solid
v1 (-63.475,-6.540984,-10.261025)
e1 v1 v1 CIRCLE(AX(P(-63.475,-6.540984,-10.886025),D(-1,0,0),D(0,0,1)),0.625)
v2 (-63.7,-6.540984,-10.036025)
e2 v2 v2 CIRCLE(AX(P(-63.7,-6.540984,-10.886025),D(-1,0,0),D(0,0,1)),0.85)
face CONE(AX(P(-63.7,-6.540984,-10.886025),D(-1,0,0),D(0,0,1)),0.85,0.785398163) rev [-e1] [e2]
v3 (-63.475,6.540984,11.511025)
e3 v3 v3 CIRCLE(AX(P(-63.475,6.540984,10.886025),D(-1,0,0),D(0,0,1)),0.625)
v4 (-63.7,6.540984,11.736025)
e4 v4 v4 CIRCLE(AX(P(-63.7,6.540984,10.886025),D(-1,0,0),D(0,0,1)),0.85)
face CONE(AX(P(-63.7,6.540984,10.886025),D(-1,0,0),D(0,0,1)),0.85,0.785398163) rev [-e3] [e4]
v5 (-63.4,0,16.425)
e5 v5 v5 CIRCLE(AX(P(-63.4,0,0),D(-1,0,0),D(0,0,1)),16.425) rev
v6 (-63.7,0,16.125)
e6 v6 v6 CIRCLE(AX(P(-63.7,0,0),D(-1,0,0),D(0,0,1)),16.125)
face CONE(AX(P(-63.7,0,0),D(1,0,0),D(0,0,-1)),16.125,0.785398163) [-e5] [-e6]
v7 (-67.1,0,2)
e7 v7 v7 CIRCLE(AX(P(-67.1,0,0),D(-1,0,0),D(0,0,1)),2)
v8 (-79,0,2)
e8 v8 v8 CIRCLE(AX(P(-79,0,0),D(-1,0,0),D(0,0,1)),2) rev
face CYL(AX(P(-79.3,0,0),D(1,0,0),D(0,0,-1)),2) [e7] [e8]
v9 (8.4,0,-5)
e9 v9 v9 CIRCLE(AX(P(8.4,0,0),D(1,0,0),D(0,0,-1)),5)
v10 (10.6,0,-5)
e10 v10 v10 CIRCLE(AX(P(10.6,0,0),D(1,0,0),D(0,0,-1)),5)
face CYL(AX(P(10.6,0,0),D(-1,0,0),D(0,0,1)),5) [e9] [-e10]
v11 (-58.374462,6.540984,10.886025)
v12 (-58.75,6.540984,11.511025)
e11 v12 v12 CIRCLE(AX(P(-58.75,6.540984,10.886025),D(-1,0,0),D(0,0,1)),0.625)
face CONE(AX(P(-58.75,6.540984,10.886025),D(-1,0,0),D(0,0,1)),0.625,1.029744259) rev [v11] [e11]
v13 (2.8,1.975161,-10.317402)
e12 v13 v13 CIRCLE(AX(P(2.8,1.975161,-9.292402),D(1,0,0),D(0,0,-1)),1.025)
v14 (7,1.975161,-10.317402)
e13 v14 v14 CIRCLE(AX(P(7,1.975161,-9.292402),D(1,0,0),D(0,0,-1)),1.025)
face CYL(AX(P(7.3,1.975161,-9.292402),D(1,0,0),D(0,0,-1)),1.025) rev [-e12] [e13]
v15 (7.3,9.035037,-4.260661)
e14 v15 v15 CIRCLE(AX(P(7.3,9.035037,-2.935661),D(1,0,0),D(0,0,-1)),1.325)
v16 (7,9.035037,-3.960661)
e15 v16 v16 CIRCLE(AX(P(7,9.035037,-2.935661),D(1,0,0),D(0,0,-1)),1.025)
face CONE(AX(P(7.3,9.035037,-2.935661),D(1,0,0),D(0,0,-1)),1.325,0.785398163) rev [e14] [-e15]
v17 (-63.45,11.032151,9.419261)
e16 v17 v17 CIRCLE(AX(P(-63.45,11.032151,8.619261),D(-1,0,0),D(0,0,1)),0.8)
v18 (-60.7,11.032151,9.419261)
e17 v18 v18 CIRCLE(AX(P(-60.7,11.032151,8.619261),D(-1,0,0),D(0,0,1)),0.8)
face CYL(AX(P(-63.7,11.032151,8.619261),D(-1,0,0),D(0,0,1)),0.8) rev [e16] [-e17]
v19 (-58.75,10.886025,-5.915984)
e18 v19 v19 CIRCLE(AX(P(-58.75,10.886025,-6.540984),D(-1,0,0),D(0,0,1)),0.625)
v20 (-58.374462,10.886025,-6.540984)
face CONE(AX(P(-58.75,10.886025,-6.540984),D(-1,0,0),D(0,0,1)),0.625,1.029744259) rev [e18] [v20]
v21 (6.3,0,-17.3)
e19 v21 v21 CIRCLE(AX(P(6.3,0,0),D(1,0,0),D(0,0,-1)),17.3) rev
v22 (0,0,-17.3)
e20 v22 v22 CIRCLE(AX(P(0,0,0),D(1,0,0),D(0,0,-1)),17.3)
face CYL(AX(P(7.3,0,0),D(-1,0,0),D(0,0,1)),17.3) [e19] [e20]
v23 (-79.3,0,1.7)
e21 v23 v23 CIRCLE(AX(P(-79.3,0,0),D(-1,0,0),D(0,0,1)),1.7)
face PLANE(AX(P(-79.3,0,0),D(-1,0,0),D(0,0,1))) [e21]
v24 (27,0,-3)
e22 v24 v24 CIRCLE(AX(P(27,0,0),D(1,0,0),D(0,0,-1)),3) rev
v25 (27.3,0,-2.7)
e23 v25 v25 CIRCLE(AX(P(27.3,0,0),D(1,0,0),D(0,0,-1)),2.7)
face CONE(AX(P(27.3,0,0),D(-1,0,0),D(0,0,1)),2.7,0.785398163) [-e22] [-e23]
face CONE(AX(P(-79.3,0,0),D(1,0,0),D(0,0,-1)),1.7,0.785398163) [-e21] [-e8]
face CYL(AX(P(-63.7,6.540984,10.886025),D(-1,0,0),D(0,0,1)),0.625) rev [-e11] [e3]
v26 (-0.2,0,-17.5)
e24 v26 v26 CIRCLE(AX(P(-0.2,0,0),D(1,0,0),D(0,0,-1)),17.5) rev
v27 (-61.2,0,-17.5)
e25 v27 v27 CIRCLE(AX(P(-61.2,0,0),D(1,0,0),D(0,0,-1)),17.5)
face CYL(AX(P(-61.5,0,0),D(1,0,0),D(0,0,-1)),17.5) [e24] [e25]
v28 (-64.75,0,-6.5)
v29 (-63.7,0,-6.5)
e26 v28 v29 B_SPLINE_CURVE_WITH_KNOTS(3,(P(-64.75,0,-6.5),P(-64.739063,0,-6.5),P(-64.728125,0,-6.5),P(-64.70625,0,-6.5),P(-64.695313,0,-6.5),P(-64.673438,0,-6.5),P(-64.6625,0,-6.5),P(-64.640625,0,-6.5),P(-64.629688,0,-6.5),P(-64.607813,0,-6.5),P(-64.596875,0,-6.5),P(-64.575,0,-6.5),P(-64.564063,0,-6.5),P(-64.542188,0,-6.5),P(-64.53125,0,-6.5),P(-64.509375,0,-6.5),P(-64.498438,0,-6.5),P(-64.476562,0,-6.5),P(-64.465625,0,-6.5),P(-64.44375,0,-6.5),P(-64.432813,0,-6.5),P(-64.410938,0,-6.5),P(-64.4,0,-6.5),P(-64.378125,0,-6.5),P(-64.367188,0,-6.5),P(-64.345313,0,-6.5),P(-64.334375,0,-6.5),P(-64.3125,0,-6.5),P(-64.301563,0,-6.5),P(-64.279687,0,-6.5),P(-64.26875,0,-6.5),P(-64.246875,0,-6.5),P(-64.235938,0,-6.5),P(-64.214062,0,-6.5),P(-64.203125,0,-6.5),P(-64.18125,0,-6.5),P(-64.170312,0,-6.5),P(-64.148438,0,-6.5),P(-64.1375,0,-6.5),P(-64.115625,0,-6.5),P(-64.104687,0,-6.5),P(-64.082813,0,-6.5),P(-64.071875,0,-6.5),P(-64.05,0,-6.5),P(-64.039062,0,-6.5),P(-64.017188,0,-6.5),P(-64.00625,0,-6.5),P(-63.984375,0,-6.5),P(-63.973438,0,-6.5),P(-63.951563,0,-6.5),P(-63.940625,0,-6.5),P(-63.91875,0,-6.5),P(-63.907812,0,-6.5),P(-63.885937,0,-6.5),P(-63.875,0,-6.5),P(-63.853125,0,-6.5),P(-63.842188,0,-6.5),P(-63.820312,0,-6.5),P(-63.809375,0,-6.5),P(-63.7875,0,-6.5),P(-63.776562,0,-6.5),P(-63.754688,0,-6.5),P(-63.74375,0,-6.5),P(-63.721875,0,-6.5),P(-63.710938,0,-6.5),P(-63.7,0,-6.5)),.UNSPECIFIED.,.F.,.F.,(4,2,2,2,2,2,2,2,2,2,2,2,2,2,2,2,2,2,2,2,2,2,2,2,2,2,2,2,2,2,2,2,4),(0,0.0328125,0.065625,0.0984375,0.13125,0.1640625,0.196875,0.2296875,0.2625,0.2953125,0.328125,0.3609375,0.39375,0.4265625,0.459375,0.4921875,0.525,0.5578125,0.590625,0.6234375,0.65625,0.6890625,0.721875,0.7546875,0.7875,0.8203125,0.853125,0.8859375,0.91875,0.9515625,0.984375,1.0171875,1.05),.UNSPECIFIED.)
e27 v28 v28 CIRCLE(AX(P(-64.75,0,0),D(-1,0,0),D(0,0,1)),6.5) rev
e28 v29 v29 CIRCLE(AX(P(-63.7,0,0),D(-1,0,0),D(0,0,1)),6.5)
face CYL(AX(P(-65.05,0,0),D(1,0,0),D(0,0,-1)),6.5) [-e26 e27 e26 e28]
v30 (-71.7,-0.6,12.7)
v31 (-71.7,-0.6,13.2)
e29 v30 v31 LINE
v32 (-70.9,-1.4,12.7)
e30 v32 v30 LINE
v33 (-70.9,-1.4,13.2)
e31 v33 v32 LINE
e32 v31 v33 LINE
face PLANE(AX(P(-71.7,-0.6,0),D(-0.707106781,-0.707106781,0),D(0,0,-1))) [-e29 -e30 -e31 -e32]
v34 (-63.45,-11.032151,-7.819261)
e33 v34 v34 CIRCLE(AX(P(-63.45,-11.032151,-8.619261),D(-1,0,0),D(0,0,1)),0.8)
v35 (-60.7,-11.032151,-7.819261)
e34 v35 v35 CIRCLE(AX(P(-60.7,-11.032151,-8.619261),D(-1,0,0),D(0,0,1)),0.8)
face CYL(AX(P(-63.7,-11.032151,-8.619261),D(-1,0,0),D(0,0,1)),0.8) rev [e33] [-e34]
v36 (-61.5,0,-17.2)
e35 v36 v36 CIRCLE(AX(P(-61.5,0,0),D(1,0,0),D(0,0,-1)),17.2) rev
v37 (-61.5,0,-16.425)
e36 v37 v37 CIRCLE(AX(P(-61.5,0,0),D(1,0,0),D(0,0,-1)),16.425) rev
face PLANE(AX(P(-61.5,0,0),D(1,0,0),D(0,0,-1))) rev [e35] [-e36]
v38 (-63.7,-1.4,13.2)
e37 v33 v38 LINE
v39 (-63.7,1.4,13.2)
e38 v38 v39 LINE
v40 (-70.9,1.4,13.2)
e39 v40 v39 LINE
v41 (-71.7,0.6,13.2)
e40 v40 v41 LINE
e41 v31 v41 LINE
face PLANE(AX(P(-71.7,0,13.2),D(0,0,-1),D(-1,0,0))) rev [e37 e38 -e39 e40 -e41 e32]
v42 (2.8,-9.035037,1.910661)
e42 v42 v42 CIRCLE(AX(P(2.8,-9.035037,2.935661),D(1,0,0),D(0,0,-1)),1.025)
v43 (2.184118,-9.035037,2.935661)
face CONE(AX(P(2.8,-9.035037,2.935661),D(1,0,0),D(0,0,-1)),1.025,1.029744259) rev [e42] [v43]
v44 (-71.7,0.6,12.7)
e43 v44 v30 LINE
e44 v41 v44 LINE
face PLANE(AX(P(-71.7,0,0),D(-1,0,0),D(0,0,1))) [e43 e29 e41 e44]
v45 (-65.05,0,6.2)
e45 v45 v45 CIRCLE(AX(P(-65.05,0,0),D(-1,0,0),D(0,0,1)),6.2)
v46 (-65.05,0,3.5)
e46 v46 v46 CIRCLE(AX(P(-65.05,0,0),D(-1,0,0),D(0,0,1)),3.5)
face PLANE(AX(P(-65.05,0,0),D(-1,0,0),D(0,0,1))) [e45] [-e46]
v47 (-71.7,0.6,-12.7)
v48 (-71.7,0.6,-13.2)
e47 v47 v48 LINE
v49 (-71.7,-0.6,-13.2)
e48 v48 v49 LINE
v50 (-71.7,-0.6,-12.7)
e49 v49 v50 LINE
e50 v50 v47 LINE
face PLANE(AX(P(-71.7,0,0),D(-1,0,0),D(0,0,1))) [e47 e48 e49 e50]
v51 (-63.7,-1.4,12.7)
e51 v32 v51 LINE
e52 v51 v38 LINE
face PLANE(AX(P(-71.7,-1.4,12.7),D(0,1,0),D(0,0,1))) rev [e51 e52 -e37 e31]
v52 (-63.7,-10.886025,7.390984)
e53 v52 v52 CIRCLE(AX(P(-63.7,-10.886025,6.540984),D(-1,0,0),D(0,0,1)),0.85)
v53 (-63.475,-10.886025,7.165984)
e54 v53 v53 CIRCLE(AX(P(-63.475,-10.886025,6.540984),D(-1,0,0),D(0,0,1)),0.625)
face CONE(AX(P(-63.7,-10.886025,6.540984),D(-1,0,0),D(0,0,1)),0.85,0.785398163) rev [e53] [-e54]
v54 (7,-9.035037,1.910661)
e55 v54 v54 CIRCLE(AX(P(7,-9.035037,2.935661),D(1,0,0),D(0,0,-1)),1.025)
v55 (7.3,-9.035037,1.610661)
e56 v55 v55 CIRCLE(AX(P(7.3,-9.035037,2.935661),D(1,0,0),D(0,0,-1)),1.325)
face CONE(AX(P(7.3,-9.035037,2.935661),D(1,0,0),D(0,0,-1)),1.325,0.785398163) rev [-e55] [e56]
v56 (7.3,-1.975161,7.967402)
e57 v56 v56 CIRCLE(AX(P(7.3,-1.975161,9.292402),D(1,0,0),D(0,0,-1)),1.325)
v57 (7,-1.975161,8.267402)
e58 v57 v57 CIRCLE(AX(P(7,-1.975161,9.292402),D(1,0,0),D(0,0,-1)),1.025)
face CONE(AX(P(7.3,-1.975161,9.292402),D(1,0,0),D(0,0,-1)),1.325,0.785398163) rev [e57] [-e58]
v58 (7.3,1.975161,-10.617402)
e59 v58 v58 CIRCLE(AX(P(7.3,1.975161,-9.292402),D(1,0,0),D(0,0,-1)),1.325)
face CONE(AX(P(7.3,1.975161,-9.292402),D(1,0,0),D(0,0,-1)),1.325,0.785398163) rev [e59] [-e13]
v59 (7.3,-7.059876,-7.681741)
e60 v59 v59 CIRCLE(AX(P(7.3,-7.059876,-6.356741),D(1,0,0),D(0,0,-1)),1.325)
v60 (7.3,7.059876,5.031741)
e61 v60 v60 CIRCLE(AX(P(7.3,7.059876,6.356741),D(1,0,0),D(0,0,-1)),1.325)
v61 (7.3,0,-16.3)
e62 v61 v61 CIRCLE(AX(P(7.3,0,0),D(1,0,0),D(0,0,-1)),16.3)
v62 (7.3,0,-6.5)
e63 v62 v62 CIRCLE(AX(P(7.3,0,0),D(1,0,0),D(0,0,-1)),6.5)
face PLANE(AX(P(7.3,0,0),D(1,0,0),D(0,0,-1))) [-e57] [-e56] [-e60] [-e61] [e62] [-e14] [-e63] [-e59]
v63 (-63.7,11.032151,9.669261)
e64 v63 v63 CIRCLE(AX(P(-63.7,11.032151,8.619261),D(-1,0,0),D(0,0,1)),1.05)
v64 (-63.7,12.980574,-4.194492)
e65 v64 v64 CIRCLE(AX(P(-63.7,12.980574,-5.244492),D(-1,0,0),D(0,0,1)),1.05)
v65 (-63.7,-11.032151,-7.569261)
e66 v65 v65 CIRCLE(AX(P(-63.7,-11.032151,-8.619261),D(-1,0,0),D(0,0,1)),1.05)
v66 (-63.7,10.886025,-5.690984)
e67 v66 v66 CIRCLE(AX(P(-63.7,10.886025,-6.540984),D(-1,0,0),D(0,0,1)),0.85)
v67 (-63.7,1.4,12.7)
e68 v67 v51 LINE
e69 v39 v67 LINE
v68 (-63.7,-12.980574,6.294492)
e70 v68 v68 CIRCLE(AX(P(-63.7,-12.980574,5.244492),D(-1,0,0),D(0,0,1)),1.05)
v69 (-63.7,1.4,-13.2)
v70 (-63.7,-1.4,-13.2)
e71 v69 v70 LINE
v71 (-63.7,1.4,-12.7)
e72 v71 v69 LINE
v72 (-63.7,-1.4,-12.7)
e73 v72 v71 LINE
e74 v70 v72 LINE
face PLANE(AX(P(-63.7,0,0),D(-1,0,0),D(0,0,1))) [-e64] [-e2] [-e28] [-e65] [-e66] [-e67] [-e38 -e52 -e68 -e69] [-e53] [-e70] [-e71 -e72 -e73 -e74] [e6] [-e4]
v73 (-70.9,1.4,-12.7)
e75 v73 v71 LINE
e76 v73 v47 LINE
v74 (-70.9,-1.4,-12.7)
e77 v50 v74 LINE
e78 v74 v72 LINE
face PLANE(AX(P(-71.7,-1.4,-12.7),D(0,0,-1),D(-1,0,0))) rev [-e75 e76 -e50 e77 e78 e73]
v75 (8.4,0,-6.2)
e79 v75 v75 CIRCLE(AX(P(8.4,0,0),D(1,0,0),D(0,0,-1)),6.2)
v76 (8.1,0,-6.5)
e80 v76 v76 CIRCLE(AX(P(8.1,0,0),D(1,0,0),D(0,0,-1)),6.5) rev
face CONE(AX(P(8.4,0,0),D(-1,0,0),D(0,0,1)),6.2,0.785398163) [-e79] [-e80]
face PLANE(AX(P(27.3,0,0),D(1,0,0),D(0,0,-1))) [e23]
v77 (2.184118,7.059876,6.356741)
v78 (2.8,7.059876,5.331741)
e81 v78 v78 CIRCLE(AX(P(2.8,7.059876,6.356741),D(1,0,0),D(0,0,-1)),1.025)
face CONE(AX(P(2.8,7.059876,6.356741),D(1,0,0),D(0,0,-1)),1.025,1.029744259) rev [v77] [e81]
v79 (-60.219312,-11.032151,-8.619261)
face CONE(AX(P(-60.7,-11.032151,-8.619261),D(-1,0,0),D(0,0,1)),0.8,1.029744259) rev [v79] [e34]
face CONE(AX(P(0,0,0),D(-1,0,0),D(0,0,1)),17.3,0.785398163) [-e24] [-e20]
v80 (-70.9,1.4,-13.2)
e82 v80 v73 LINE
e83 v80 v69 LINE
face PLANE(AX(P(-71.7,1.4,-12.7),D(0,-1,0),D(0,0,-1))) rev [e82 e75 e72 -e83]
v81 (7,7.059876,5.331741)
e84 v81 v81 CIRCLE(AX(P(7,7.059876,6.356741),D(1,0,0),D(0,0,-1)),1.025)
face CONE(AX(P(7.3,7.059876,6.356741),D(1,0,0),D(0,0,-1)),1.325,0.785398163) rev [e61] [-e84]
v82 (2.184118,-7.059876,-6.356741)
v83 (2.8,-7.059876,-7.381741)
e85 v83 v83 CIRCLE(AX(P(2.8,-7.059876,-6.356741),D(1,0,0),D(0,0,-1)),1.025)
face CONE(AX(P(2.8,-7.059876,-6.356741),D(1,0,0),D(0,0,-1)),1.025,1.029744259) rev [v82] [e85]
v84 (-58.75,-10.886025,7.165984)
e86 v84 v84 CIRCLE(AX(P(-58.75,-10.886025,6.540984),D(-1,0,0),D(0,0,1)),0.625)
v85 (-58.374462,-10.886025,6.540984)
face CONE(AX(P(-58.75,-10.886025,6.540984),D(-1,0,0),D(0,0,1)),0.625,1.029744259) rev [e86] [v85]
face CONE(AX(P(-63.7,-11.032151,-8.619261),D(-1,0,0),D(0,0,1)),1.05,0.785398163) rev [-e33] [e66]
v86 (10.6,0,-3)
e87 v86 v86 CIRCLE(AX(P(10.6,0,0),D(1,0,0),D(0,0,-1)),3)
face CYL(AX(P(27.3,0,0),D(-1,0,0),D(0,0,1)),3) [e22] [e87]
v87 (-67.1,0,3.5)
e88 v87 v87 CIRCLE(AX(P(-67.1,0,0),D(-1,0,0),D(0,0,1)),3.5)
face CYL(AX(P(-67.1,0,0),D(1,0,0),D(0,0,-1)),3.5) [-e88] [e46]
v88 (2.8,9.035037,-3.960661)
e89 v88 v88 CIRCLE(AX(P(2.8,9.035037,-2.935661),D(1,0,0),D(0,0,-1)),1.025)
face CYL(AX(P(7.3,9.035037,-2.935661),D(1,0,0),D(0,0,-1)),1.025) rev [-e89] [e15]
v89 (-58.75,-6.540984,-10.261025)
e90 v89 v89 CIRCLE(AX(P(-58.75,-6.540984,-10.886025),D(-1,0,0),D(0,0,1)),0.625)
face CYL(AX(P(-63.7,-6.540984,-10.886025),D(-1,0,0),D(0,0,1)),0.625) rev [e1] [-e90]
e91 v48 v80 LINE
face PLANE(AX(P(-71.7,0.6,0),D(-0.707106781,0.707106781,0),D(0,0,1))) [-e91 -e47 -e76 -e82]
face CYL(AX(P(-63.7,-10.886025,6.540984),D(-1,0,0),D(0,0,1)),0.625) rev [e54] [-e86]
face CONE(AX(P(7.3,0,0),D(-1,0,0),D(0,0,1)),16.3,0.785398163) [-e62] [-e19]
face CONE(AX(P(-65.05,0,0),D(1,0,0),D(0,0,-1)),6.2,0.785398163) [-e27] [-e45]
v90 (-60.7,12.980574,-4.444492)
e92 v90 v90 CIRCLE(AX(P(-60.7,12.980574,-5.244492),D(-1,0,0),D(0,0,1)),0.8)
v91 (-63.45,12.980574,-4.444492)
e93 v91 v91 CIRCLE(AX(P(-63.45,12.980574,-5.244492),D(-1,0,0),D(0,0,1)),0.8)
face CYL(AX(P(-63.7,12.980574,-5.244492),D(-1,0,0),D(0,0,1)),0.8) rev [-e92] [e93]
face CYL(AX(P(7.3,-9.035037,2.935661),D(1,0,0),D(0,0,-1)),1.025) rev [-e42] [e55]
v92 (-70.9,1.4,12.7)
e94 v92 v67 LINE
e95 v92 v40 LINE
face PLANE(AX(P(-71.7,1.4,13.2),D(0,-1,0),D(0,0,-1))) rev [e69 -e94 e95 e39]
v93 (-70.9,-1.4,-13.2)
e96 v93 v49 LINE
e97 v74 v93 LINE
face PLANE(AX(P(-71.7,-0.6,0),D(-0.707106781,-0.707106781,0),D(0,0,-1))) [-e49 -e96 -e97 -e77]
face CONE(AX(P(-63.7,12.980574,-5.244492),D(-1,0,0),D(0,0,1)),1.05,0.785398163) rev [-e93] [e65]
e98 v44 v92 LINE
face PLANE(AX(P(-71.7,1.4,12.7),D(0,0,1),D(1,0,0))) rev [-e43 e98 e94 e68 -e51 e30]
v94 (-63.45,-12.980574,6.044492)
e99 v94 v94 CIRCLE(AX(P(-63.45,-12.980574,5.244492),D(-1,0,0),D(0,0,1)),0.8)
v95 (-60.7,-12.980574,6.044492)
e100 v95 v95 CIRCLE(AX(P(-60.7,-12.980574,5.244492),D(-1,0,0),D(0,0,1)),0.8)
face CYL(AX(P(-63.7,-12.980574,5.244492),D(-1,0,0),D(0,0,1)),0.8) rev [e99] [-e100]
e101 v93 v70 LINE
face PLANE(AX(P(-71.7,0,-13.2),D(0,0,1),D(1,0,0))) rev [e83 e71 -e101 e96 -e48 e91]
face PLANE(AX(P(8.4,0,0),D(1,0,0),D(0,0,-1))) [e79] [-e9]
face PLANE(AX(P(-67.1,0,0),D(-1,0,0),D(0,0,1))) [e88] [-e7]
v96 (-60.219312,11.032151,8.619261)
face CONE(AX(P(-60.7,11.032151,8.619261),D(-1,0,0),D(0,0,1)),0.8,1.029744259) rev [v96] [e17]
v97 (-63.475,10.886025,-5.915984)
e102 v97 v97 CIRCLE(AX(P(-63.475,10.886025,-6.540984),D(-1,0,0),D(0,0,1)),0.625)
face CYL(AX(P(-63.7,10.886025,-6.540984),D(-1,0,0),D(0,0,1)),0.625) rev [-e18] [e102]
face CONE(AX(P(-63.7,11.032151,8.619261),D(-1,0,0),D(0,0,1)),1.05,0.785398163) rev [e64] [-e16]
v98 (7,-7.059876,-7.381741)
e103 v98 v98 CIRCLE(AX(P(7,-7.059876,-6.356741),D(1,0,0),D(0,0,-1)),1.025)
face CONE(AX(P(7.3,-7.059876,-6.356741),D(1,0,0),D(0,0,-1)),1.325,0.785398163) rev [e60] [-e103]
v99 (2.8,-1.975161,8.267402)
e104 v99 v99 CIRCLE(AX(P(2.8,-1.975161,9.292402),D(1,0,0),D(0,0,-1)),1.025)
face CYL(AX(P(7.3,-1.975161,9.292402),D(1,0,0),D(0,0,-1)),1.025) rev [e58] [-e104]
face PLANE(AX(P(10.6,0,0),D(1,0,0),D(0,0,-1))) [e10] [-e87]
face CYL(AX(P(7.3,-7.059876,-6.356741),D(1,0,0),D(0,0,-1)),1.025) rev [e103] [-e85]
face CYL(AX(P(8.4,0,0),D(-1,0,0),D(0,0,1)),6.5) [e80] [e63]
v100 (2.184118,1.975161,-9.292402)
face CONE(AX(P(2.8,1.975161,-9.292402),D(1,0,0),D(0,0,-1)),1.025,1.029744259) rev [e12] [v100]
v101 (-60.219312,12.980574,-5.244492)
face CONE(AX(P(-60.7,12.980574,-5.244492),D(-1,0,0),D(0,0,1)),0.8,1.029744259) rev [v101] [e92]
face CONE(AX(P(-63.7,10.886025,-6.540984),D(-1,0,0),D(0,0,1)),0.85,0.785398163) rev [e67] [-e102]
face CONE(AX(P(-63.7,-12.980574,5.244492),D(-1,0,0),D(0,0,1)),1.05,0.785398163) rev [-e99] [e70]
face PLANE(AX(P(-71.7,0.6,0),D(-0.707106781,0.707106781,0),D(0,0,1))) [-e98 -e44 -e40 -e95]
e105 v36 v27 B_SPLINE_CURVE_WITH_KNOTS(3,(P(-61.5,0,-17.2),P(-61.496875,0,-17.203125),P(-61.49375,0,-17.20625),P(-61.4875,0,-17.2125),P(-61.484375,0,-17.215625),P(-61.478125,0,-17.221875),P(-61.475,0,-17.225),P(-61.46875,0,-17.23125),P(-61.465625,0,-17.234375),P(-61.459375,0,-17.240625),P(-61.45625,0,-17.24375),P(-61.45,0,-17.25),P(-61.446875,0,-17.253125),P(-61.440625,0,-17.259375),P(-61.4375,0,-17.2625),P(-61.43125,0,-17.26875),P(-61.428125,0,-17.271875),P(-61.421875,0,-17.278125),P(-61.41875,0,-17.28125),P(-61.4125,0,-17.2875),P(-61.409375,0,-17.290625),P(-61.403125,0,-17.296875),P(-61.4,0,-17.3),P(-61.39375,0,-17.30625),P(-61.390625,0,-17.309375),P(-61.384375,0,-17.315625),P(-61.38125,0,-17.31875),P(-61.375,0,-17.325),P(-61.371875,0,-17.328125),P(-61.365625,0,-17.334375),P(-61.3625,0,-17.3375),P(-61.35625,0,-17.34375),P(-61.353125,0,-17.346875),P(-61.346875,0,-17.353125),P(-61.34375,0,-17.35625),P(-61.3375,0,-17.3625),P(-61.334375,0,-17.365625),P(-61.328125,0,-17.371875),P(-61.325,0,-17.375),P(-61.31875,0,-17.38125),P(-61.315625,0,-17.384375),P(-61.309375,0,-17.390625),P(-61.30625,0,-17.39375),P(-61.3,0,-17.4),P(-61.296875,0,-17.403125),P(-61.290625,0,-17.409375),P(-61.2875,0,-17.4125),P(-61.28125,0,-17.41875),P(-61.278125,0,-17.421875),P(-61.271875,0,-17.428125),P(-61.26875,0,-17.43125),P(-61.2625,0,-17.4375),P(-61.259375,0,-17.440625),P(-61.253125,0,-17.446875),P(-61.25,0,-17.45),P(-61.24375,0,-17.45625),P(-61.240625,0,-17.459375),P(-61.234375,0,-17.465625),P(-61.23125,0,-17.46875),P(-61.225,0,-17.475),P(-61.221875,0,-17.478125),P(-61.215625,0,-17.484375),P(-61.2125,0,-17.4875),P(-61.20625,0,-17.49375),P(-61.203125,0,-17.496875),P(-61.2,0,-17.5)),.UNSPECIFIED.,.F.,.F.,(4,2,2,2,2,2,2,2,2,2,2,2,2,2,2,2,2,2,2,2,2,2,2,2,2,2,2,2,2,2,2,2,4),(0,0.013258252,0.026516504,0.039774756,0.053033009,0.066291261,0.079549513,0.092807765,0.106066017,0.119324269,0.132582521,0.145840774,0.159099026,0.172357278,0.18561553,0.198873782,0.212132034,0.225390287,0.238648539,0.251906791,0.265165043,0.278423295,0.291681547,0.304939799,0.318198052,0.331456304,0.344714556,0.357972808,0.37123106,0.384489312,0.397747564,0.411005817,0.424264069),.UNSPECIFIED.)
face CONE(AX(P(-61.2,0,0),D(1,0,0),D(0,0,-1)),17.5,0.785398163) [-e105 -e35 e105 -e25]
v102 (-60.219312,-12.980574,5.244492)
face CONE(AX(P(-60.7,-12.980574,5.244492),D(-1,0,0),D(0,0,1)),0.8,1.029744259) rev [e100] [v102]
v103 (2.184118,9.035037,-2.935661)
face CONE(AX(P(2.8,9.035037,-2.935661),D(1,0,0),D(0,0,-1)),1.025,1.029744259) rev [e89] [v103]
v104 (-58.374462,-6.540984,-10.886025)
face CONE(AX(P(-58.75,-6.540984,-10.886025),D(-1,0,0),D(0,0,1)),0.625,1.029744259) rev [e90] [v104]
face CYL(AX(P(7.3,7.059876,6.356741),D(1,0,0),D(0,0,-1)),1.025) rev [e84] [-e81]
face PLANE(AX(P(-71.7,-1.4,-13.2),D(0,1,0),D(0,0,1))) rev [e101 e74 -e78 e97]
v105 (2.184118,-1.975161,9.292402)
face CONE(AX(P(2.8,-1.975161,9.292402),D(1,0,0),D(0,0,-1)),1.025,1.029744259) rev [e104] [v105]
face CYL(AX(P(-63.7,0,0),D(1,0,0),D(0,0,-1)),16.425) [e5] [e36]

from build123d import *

# Parameters (mm, degrees)
SKETCH1_R                          = 17.5
BOSS_EXTRUDE1_DEPTH                = 61.5
SKETCH3_R                          = 17.3
BOSS_EXTRUDE2_DEPTH                = 7.3
SKETCH4_R                          = 6.5
BOSS_EXTRUDE3_DEPTH                = 1.1
SKETCH5_R                          = 5
BOSS_EXTRUDE4_DEPTH                = 2.2
SKETCH6_R                          = 3
BOSS_EXTRUDE5_DEPTH                = 16.7
SKETCH7_R                          = 16.425
BOSS_EXTRUDE6_DEPTH                = 2.2
BOSS_EXTRUDE7_START                = 1.35
SKETCH8_R                          = 6.5
BOSS_EXTRUDE7_DEPTH                = 1.35
SKETCH9_R                          = 3.5
BOSS_EXTRUDE8_DEPTH                = 2.05
SKETCH10_R                         = 2
BOSS_EXTRUDE9_DEPTH                = 12.2
BOSS_EXTRUDE10_DEPTH               = 8
CHAMFER1_SIZE                      = 0.3
CHAMFER2_SIZE                      = 0.2
CHAMFER3_SIZE                      = 1
CHAMFER4_SIZE                      = 0.8
M2_5X0_45_TAPPED_HOLE1_D           = 2.05
M2_5X0_45_TAPPED_HOLE1_DEPTH       = 4.5
M2_5X0_45_TAPPED_HOLE1_CSINK_D     = 2.65
M2_5X0_45_TAPPED_HOLE1_CSINK_ANGLE = 90
M2_5X0_45_TAPPED_HOLE1_TIP         = 0.615882135
M2X0_4_TAPPED_HOLE1_D              = 1.6
M2X0_4_TAPPED_HOLE1_DEPTH          = 3
M2X0_4_TAPPED_HOLE1_CSINK_D        = 2.1
M2X0_4_TAPPED_HOLE1_CSINK_ANGLE    = 90
M2X0_4_TAPPED_HOLE1_TIP            = 0.480688495
M1_6X0_35_TAPPED_HOLE1_D           = 1.25
M1_6X0_35_TAPPED_HOLE1_DEPTH       = 4.95
M1_6X0_35_TAPPED_HOLE1_CSINK_D     = 1.7
M1_6X0_35_TAPPED_HOLE1_CSINK_ANGLE = 90
M1_6X0_35_TAPPED_HOLE1_TIP         = 0.375537887


with BuildPart() as part:
    # Sketch1 → Boss-Extrude1 (new body)
    with BuildSketch(Plane(origin=(0, 0, 0), x_dir=(0, 0, -1), z_dir=(1, 0, 0))):
        Circle(SKETCH1_R)
    extrude(amount=-BOSS_EXTRUDE1_DEPTH)

    # Sketch3 → Boss-Extrude2 (add)
    with BuildSketch(Plane(origin=(0, 0, 0), x_dir=(0, 0, -1), z_dir=(1, 0, 0))):
        Circle(SKETCH3_R)
    extrude(amount=BOSS_EXTRUDE2_DEPTH)

    # Sketch4 → Boss-Extrude3 (add)
    with BuildSketch(Plane(origin=(7.3, 0, 0), x_dir=(0, 0, -1), z_dir=(1, 0, 0))):
        Circle(SKETCH4_R)
    extrude(amount=BOSS_EXTRUDE3_DEPTH)

    # Sketch5 → Boss-Extrude4 (add)
    with BuildSketch(Plane(origin=(8.4, 0, 0), x_dir=(0, 0, -1), z_dir=(1, 0, 0))):
        Circle(SKETCH5_R)
    extrude(amount=BOSS_EXTRUDE4_DEPTH)

    # Sketch6 → Boss-Extrude5 (add)
    with BuildSketch(Plane(origin=(10.6, 0, 0), x_dir=(0, 0, -1), z_dir=(1, 0, 0))):
        Circle(SKETCH6_R)
    extrude(amount=BOSS_EXTRUDE5_DEPTH)

    # Sketch7 → Boss-Extrude6 (add)
    with BuildSketch(Plane.ZY.offset(61.5)):
        with Locations(Location((0, 0, 0), (0, 0, 180))):
            Circle(SKETCH7_R)
    extrude(amount=BOSS_EXTRUDE6_DEPTH)

    # Sketch8 → Boss-Extrude7 (add)
    with BuildSketch(Plane.ZY.offset(63.7).offset(BOSS_EXTRUDE7_START)):
        with Locations(Location((0, 0, 0), (0, 0, 180))):
            Circle(SKETCH8_R)
    extrude(amount=-BOSS_EXTRUDE7_DEPTH)

    # Sketch9 → Boss-Extrude8 (add)
    with BuildSketch(Plane.ZY.offset(65.05)):
        Circle(SKETCH9_R)
    extrude(amount=BOSS_EXTRUDE8_DEPTH)

    # Sketch10 → Boss-Extrude9 (add)
    with BuildSketch(Plane.ZY.offset(67.1)):
        Circle(SKETCH10_R)
    extrude(amount=BOSS_EXTRUDE9_DEPTH)

    # Sketch11 → Boss-Extrude10 (add)
    with BuildSketch(Plane.ZY.offset(63.7)):
        Polygon((-12.7, 1.4), (-13.2, 1.4), (-13.2, 0), (-13.2, -1.4), (-12.7, -1.4), (-12.7, 0), align=None)
        Polygon((12.7, -1.4), (13.2, -1.4), (13.2, 0), (13.2, 1.4), (12.7, 1.4), (12.7, 0), align=None)
    extrude(amount=BOSS_EXTRUDE10_DEPTH)

    # Chamfer1
    chamfer1_edges = [part.edges().sort_by_distance(p)[0] for p in [
        (8.4, 0, 6.5),
        (27.3, 0, 3),
        (-63.7, 0, 16.425),
        (-65.05, 0, 6.5),
        (-79.3, 0, -2),
        (-61.5, 0, 17.5),
    ]]
    chamfer(chamfer1_edges, length=CHAMFER1_SIZE)

    # Chamfer2
    chamfer2_edges = [part.edges().sort_by_distance(p)[0] for p in [
        (0, 0, 17.5),
    ]]
    chamfer(chamfer2_edges, length=CHAMFER2_SIZE - 0.0001)  # a hair under: the kernel refuses the full size

    # Chamfer3
    chamfer3_edges = [part.edges().sort_by_distance(p)[0] for p in [
        (7.3, 0, 17.3),
    ]]
    chamfer(chamfer3_edges, length=CHAMFER3_SIZE)

    # Chamfer4
    chamfer4_edges = [part.edges().sort_by_distance(p)[0] for p in [
        (-71.7, 1.4, -12.95),
        (-71.7, -1.4, -12.95),
        (-71.7, -1.4, 12.95),
        (-71.7, 1.4, 12.95),
    ]]
    chamfer(chamfer4_edges, length=CHAMFER4_SIZE)

    # M2.5x0.45 Tapped Hole1
    with Locations(Plane(origin=(7.3, 0, 0), x_dir=(0, 0, -1), z_dir=(1, 0, 0))):
        with Locations((-6.35674076, 7.059875842), (2.935661447, 9.035036905), (9.292402207, 1.975161063), (6.35674076, -7.059875842), (-2.935661447, -9.035036905), (-9.292402207, -1.975161063)):
            CounterSinkHole(M2_5X0_45_TAPPED_HOLE1_D / 2, M2_5X0_45_TAPPED_HOLE1_CSINK_D / 2, depth=M2_5X0_45_TAPPED_HOLE1_DEPTH, counter_sink_angle=M2_5X0_45_TAPPED_HOLE1_CSINK_ANGLE)
            with Locations((0, 0, -(M2_5X0_45_TAPPED_HOLE1_DEPTH + M2_5X0_45_TAPPED_HOLE1_TIP / 2))):  # 118° drill point
                Cone(0, M2_5X0_45_TAPPED_HOLE1_D / 2, M2_5X0_45_TAPPED_HOLE1_TIP, mode=Mode.SUBTRACT)

    # M2x0.4 Tapped Hole1
    with Locations(Plane.ZY.offset(63.7)):
        with Locations((8.619260655, 11.03215055), (-5.244492308, 12.980573964), (-8.619260655, -11.03215055), (5.244492308, -12.980573964)):
            CounterSinkHole(M2X0_4_TAPPED_HOLE1_D / 2, M2X0_4_TAPPED_HOLE1_CSINK_D / 2, depth=M2X0_4_TAPPED_HOLE1_DEPTH, counter_sink_angle=M2X0_4_TAPPED_HOLE1_CSINK_ANGLE)
            with Locations((0, 0, -(M2X0_4_TAPPED_HOLE1_DEPTH + M2X0_4_TAPPED_HOLE1_TIP / 2))):  # 118° drill point
                Cone(0, M2X0_4_TAPPED_HOLE1_D / 2, M2X0_4_TAPPED_HOLE1_TIP, mode=Mode.SUBTRACT)

    # M1.6x0.35 Tapped Hole1
    with Locations(Plane.ZY.offset(63.7)):
        with Locations((-6.540983551, 10.886024719), (-10.886024719, -6.540983551), (6.540983551, -10.886024719), (10.886024719, 6.540983551)):
            CounterSinkHole(M1_6X0_35_TAPPED_HOLE1_D / 2, M1_6X0_35_TAPPED_HOLE1_CSINK_D / 2, depth=M1_6X0_35_TAPPED_HOLE1_DEPTH, counter_sink_angle=M1_6X0_35_TAPPED_HOLE1_CSINK_ANGLE)
            with Locations((0, 0, -(M1_6X0_35_TAPPED_HOLE1_DEPTH + M1_6X0_35_TAPPED_HOLE1_TIP / 2))):  # 118° drill point
                Cone(0, M1_6X0_35_TAPPED_HOLE1_D / 2, M1_6X0_35_TAPPED_HOLE1_TIP, mode=Mode.SUBTRACT)


solid = part.part
